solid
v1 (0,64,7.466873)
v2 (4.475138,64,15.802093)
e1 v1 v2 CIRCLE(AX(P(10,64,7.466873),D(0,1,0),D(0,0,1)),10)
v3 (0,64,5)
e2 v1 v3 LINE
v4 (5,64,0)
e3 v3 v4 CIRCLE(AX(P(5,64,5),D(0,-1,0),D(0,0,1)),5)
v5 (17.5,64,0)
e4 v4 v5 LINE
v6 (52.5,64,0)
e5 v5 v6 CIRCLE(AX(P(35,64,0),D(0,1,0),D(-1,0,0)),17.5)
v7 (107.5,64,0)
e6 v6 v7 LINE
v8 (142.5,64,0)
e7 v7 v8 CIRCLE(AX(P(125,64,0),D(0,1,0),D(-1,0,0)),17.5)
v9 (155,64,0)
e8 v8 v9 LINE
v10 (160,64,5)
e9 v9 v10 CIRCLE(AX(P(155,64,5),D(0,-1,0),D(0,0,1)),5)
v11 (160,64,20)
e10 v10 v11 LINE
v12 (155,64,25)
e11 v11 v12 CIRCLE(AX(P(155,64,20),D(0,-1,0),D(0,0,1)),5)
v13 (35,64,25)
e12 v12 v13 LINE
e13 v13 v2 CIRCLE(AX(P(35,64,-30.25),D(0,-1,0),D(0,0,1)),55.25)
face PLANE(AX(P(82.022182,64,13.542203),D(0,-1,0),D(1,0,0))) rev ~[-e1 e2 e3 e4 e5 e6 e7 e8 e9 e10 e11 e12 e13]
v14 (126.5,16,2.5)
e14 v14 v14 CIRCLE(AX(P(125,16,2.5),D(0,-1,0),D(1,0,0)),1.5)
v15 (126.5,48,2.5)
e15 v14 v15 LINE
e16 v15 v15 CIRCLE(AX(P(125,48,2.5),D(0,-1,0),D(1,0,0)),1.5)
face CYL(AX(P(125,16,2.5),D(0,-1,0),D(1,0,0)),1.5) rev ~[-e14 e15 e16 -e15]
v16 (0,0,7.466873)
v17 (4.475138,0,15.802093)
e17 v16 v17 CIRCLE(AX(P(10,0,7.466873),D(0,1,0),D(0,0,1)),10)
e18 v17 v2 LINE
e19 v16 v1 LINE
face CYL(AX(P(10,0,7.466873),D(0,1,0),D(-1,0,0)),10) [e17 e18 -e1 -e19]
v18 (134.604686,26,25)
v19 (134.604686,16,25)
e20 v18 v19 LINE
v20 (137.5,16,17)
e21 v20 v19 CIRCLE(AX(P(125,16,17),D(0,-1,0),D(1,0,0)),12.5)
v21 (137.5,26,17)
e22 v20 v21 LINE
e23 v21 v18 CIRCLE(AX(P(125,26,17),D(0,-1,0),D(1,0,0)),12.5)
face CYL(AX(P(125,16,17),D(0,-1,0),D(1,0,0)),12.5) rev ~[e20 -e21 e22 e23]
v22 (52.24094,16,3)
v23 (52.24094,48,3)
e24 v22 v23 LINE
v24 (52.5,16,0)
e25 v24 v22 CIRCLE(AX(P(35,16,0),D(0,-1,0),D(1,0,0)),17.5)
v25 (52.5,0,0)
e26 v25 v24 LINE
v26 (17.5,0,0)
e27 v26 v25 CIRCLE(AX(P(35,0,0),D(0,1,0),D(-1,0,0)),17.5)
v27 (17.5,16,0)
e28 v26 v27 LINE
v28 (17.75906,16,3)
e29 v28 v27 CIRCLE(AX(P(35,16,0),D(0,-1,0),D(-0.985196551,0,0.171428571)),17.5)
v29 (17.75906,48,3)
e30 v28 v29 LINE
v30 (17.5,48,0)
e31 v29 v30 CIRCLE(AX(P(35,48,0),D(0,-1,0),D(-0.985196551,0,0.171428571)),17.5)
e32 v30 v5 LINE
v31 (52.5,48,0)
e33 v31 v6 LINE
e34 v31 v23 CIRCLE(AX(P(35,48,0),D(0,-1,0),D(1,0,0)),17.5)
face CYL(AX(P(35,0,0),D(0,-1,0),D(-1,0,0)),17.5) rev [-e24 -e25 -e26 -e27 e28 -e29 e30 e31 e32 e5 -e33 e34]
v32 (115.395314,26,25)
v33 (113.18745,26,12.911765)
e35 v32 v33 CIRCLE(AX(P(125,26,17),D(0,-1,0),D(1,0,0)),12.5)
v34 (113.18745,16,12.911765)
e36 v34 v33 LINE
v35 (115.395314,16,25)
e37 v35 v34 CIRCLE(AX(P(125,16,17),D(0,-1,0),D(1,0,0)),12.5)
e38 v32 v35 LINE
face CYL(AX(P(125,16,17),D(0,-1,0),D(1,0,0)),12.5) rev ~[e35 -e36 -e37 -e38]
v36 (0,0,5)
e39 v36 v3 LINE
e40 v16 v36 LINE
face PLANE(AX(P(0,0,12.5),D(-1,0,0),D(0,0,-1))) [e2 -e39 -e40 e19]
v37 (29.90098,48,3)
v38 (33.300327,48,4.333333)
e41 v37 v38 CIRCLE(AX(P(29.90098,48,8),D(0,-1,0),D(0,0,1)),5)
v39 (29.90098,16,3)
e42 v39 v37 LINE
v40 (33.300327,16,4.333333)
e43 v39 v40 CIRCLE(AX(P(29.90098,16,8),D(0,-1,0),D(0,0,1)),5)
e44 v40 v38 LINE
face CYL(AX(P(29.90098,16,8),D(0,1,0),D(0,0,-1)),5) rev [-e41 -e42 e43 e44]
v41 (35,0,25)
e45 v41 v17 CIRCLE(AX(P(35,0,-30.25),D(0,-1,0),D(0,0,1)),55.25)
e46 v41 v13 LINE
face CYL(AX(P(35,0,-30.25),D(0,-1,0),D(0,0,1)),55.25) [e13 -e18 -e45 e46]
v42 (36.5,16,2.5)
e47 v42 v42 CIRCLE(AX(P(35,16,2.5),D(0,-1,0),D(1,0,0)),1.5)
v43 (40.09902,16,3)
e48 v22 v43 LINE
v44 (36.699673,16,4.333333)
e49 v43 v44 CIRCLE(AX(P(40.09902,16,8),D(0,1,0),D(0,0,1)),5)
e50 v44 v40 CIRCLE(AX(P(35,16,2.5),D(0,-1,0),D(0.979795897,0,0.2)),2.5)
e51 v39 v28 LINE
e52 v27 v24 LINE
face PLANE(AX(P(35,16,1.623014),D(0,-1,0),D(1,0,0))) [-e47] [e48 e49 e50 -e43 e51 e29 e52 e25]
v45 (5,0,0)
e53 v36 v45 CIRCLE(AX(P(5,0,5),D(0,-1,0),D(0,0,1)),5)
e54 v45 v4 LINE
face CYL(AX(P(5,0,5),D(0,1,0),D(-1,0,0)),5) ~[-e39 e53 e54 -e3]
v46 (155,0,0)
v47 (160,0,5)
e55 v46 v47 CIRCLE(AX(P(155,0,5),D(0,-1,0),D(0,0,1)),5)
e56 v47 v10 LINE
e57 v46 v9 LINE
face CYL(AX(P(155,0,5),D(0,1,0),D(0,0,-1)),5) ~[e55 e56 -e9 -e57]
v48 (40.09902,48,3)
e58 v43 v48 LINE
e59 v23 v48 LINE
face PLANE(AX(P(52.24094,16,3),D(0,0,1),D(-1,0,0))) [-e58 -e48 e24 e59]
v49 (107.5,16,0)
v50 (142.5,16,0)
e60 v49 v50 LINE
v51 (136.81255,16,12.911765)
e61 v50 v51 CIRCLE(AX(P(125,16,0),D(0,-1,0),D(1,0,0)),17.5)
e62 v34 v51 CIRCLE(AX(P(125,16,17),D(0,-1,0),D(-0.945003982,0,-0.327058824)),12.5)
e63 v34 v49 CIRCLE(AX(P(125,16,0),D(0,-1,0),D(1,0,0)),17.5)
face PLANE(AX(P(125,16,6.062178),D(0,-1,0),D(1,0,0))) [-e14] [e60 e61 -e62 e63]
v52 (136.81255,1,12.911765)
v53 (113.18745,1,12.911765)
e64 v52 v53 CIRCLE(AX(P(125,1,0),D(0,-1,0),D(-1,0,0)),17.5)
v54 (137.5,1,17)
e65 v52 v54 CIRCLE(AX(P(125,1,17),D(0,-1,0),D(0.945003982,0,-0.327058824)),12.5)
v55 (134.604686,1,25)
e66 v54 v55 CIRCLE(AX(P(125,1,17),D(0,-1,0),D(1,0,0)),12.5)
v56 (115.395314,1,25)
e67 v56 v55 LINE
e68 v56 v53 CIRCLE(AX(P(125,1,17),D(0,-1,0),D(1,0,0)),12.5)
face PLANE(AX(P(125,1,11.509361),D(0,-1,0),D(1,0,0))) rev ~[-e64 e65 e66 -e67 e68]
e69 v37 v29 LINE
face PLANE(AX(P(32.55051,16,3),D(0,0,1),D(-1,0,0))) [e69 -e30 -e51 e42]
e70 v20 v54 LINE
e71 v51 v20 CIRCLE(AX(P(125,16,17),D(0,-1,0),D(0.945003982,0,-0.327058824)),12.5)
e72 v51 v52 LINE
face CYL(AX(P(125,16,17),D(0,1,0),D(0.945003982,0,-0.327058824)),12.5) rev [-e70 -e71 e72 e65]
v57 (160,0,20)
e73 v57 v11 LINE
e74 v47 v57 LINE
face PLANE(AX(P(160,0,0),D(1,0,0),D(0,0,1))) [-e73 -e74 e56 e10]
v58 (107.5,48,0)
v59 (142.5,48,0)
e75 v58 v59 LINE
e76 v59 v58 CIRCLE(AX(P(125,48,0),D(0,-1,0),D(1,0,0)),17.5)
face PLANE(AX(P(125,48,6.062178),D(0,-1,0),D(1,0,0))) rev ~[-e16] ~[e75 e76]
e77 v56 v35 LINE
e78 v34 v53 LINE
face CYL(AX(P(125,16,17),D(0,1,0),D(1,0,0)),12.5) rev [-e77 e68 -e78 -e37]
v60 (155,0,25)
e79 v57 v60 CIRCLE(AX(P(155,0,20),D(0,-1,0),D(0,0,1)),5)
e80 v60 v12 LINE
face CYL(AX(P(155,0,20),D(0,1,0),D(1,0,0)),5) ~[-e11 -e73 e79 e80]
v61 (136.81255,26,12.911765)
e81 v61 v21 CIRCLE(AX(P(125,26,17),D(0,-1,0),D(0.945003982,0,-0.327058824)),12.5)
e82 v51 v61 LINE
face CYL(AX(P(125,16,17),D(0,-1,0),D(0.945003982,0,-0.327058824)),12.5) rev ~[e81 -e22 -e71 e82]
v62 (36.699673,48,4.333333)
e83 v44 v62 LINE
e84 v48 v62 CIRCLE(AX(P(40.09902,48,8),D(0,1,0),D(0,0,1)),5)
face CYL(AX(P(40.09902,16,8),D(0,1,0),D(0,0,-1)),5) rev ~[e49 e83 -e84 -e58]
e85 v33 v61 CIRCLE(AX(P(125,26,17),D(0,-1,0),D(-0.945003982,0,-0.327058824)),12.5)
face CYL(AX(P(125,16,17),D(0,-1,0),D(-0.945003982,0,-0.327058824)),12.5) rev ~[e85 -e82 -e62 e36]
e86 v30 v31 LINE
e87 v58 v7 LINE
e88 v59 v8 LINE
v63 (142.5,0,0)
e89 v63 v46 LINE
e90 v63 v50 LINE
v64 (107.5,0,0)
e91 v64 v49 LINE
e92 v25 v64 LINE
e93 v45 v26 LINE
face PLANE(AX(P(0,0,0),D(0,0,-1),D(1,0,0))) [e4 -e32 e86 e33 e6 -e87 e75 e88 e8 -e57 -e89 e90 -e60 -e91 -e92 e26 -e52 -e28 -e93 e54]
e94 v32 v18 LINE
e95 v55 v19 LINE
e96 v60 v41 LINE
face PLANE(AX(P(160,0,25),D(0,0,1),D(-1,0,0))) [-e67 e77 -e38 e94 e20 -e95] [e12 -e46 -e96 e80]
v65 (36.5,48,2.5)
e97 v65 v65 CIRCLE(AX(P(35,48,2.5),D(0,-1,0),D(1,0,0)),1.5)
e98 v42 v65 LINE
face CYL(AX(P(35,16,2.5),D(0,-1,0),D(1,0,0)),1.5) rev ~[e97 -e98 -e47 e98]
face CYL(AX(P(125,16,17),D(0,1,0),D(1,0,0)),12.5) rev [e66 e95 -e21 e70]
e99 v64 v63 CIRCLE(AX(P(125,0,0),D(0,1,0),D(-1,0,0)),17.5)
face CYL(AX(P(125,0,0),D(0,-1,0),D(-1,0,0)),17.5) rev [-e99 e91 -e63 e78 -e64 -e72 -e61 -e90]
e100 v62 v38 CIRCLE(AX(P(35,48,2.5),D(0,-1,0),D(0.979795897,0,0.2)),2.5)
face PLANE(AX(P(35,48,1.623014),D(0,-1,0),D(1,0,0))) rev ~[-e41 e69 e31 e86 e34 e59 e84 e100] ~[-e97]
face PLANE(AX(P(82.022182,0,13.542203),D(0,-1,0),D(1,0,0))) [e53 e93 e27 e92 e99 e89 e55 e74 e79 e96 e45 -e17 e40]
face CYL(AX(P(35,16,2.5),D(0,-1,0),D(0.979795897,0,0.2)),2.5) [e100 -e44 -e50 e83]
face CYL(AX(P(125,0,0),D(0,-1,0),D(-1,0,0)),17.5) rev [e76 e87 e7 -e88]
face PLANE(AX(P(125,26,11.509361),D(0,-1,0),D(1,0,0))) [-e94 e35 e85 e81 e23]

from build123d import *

# Parameters (mm, degrees)
F1_DEPTH      = 64
F2_R          = 5
F3_R          = 10
F5_R          = 1.5
F6_DEPTH      = 32
F7_R          = 5
F9_DEPTH      = 10
F9_DEPTH_BACK = 15


with BuildPart() as f1:
    # F0 (on Front) → F1 (new body)
    with BuildSketch(Plane.XZ):
        with BuildLine():
            Line((0, 12.5), (0, 0))
            Line((0, 0), (17.5, 0))
            ThreePointArc((17.5, 0), (35, 17.5), (52.5, 0))
            Line((52.5, 0), (107.5, 0))
            ThreePointArc((107.5, 0), (125, 17.5), (142.5, 0))
            Line((142.5, 0), (160, 0))
            Line((160, 0), (160, 25))
            Line((160, 25), (35, 25))
            ThreePointArc((35, 25), (16.4174140659, 21.7812406156), (0, 12.5))
        make_face()
    extrude(amount=-F1_DEPTH)

    # F2
    f2_edges = [f1.edges().sort_by_distance(p)[0] for p in [
        (160, 32, 25),
        (0, 32, 0),
        (160, 32, 0),
    ]]
    fillet(f2_edges, radius=F2_R)

    # F3
    f3_edges = [f1.edges().sort_by_distance(p)[0] for p in [
        (0, 32, 12.5),
    ]]
    fillet(f3_edges, radius=F3_R)

    # F5 (on offset) → F6 (join)
    with BuildSketch(Plane.XZ.offset(-16)):
        with BuildLine():
            Line((17.5, 0), (52.5, 0))
            ThreePointArc((52.5, 0), (52.4351146235, 1.5055823014), (52.2409396496, 3))
            Line((52.2409396496, 3), (37.4494897428, 3))
            ThreePointArc((37.4494897428, 3), (35, 5), (32.5505102572, 3))
            Line((32.5505102572, 3), (17.7590603504, 3))
            ThreePointArc((17.7590603504, 3), (17.5648853765, 1.5055823014), (17.5, 0))
        make_face()
        with Locations((35, 2.5)):
            Circle(F5_R, mode=Mode.SUBTRACT)
        with BuildLine():
            Line((107.5, 0), (142.5, 0))
            ThreePointArc((142.5, 0), (125, 17.5), (107.5, 0))
        make_face()
        with Locations((125, 2.5)):
            Circle(F5_R, mode=Mode.SUBTRACT)
    extrude(amount=-F6_DEPTH)

    # F7
    f7_edges = [f1.edges().sort_by_distance(p)[0] for p in [
        (37.44949, 32, 3),
        (32.55051, 32, 3),
    ]]
    fillet(f7_edges, radius=F7_R)

    # F8 (on offset) → F9 (cut, two sides)
    with BuildSketch(Plane.XZ.offset(-16)) as f9_sk:
        with BuildLine():
            ThreePointArc((113.1874502253, 12.9117647059), (125, 4.5), (136.8125497747, 12.9117647059))
            ThreePointArc((136.8125497747, 12.9117647059), (125, 17.5), (113.1874502253, 12.9117647059))
        make_face()
        with BuildLine():
            ThreePointArc((113.1874502253, 12.9117647059), (125, 17.5), (136.8125497747, 12.9117647059))
            ThreePointArc((136.8125497747, 12.9117647059), (137.3269394455, 14.9271845456), (137.5, 17))
            ThreePointArc((137.5, 17), (122.9271845456, 29.3269394455), (113.1874502253, 12.9117647059))
        make_face()
    extrude(amount=-F9_DEPTH, mode=Mode.SUBTRACT)
    extrude(f9_sk.sketch, amount=F9_DEPTH_BACK, mode=Mode.SUBTRACT)


solid = f1.part
